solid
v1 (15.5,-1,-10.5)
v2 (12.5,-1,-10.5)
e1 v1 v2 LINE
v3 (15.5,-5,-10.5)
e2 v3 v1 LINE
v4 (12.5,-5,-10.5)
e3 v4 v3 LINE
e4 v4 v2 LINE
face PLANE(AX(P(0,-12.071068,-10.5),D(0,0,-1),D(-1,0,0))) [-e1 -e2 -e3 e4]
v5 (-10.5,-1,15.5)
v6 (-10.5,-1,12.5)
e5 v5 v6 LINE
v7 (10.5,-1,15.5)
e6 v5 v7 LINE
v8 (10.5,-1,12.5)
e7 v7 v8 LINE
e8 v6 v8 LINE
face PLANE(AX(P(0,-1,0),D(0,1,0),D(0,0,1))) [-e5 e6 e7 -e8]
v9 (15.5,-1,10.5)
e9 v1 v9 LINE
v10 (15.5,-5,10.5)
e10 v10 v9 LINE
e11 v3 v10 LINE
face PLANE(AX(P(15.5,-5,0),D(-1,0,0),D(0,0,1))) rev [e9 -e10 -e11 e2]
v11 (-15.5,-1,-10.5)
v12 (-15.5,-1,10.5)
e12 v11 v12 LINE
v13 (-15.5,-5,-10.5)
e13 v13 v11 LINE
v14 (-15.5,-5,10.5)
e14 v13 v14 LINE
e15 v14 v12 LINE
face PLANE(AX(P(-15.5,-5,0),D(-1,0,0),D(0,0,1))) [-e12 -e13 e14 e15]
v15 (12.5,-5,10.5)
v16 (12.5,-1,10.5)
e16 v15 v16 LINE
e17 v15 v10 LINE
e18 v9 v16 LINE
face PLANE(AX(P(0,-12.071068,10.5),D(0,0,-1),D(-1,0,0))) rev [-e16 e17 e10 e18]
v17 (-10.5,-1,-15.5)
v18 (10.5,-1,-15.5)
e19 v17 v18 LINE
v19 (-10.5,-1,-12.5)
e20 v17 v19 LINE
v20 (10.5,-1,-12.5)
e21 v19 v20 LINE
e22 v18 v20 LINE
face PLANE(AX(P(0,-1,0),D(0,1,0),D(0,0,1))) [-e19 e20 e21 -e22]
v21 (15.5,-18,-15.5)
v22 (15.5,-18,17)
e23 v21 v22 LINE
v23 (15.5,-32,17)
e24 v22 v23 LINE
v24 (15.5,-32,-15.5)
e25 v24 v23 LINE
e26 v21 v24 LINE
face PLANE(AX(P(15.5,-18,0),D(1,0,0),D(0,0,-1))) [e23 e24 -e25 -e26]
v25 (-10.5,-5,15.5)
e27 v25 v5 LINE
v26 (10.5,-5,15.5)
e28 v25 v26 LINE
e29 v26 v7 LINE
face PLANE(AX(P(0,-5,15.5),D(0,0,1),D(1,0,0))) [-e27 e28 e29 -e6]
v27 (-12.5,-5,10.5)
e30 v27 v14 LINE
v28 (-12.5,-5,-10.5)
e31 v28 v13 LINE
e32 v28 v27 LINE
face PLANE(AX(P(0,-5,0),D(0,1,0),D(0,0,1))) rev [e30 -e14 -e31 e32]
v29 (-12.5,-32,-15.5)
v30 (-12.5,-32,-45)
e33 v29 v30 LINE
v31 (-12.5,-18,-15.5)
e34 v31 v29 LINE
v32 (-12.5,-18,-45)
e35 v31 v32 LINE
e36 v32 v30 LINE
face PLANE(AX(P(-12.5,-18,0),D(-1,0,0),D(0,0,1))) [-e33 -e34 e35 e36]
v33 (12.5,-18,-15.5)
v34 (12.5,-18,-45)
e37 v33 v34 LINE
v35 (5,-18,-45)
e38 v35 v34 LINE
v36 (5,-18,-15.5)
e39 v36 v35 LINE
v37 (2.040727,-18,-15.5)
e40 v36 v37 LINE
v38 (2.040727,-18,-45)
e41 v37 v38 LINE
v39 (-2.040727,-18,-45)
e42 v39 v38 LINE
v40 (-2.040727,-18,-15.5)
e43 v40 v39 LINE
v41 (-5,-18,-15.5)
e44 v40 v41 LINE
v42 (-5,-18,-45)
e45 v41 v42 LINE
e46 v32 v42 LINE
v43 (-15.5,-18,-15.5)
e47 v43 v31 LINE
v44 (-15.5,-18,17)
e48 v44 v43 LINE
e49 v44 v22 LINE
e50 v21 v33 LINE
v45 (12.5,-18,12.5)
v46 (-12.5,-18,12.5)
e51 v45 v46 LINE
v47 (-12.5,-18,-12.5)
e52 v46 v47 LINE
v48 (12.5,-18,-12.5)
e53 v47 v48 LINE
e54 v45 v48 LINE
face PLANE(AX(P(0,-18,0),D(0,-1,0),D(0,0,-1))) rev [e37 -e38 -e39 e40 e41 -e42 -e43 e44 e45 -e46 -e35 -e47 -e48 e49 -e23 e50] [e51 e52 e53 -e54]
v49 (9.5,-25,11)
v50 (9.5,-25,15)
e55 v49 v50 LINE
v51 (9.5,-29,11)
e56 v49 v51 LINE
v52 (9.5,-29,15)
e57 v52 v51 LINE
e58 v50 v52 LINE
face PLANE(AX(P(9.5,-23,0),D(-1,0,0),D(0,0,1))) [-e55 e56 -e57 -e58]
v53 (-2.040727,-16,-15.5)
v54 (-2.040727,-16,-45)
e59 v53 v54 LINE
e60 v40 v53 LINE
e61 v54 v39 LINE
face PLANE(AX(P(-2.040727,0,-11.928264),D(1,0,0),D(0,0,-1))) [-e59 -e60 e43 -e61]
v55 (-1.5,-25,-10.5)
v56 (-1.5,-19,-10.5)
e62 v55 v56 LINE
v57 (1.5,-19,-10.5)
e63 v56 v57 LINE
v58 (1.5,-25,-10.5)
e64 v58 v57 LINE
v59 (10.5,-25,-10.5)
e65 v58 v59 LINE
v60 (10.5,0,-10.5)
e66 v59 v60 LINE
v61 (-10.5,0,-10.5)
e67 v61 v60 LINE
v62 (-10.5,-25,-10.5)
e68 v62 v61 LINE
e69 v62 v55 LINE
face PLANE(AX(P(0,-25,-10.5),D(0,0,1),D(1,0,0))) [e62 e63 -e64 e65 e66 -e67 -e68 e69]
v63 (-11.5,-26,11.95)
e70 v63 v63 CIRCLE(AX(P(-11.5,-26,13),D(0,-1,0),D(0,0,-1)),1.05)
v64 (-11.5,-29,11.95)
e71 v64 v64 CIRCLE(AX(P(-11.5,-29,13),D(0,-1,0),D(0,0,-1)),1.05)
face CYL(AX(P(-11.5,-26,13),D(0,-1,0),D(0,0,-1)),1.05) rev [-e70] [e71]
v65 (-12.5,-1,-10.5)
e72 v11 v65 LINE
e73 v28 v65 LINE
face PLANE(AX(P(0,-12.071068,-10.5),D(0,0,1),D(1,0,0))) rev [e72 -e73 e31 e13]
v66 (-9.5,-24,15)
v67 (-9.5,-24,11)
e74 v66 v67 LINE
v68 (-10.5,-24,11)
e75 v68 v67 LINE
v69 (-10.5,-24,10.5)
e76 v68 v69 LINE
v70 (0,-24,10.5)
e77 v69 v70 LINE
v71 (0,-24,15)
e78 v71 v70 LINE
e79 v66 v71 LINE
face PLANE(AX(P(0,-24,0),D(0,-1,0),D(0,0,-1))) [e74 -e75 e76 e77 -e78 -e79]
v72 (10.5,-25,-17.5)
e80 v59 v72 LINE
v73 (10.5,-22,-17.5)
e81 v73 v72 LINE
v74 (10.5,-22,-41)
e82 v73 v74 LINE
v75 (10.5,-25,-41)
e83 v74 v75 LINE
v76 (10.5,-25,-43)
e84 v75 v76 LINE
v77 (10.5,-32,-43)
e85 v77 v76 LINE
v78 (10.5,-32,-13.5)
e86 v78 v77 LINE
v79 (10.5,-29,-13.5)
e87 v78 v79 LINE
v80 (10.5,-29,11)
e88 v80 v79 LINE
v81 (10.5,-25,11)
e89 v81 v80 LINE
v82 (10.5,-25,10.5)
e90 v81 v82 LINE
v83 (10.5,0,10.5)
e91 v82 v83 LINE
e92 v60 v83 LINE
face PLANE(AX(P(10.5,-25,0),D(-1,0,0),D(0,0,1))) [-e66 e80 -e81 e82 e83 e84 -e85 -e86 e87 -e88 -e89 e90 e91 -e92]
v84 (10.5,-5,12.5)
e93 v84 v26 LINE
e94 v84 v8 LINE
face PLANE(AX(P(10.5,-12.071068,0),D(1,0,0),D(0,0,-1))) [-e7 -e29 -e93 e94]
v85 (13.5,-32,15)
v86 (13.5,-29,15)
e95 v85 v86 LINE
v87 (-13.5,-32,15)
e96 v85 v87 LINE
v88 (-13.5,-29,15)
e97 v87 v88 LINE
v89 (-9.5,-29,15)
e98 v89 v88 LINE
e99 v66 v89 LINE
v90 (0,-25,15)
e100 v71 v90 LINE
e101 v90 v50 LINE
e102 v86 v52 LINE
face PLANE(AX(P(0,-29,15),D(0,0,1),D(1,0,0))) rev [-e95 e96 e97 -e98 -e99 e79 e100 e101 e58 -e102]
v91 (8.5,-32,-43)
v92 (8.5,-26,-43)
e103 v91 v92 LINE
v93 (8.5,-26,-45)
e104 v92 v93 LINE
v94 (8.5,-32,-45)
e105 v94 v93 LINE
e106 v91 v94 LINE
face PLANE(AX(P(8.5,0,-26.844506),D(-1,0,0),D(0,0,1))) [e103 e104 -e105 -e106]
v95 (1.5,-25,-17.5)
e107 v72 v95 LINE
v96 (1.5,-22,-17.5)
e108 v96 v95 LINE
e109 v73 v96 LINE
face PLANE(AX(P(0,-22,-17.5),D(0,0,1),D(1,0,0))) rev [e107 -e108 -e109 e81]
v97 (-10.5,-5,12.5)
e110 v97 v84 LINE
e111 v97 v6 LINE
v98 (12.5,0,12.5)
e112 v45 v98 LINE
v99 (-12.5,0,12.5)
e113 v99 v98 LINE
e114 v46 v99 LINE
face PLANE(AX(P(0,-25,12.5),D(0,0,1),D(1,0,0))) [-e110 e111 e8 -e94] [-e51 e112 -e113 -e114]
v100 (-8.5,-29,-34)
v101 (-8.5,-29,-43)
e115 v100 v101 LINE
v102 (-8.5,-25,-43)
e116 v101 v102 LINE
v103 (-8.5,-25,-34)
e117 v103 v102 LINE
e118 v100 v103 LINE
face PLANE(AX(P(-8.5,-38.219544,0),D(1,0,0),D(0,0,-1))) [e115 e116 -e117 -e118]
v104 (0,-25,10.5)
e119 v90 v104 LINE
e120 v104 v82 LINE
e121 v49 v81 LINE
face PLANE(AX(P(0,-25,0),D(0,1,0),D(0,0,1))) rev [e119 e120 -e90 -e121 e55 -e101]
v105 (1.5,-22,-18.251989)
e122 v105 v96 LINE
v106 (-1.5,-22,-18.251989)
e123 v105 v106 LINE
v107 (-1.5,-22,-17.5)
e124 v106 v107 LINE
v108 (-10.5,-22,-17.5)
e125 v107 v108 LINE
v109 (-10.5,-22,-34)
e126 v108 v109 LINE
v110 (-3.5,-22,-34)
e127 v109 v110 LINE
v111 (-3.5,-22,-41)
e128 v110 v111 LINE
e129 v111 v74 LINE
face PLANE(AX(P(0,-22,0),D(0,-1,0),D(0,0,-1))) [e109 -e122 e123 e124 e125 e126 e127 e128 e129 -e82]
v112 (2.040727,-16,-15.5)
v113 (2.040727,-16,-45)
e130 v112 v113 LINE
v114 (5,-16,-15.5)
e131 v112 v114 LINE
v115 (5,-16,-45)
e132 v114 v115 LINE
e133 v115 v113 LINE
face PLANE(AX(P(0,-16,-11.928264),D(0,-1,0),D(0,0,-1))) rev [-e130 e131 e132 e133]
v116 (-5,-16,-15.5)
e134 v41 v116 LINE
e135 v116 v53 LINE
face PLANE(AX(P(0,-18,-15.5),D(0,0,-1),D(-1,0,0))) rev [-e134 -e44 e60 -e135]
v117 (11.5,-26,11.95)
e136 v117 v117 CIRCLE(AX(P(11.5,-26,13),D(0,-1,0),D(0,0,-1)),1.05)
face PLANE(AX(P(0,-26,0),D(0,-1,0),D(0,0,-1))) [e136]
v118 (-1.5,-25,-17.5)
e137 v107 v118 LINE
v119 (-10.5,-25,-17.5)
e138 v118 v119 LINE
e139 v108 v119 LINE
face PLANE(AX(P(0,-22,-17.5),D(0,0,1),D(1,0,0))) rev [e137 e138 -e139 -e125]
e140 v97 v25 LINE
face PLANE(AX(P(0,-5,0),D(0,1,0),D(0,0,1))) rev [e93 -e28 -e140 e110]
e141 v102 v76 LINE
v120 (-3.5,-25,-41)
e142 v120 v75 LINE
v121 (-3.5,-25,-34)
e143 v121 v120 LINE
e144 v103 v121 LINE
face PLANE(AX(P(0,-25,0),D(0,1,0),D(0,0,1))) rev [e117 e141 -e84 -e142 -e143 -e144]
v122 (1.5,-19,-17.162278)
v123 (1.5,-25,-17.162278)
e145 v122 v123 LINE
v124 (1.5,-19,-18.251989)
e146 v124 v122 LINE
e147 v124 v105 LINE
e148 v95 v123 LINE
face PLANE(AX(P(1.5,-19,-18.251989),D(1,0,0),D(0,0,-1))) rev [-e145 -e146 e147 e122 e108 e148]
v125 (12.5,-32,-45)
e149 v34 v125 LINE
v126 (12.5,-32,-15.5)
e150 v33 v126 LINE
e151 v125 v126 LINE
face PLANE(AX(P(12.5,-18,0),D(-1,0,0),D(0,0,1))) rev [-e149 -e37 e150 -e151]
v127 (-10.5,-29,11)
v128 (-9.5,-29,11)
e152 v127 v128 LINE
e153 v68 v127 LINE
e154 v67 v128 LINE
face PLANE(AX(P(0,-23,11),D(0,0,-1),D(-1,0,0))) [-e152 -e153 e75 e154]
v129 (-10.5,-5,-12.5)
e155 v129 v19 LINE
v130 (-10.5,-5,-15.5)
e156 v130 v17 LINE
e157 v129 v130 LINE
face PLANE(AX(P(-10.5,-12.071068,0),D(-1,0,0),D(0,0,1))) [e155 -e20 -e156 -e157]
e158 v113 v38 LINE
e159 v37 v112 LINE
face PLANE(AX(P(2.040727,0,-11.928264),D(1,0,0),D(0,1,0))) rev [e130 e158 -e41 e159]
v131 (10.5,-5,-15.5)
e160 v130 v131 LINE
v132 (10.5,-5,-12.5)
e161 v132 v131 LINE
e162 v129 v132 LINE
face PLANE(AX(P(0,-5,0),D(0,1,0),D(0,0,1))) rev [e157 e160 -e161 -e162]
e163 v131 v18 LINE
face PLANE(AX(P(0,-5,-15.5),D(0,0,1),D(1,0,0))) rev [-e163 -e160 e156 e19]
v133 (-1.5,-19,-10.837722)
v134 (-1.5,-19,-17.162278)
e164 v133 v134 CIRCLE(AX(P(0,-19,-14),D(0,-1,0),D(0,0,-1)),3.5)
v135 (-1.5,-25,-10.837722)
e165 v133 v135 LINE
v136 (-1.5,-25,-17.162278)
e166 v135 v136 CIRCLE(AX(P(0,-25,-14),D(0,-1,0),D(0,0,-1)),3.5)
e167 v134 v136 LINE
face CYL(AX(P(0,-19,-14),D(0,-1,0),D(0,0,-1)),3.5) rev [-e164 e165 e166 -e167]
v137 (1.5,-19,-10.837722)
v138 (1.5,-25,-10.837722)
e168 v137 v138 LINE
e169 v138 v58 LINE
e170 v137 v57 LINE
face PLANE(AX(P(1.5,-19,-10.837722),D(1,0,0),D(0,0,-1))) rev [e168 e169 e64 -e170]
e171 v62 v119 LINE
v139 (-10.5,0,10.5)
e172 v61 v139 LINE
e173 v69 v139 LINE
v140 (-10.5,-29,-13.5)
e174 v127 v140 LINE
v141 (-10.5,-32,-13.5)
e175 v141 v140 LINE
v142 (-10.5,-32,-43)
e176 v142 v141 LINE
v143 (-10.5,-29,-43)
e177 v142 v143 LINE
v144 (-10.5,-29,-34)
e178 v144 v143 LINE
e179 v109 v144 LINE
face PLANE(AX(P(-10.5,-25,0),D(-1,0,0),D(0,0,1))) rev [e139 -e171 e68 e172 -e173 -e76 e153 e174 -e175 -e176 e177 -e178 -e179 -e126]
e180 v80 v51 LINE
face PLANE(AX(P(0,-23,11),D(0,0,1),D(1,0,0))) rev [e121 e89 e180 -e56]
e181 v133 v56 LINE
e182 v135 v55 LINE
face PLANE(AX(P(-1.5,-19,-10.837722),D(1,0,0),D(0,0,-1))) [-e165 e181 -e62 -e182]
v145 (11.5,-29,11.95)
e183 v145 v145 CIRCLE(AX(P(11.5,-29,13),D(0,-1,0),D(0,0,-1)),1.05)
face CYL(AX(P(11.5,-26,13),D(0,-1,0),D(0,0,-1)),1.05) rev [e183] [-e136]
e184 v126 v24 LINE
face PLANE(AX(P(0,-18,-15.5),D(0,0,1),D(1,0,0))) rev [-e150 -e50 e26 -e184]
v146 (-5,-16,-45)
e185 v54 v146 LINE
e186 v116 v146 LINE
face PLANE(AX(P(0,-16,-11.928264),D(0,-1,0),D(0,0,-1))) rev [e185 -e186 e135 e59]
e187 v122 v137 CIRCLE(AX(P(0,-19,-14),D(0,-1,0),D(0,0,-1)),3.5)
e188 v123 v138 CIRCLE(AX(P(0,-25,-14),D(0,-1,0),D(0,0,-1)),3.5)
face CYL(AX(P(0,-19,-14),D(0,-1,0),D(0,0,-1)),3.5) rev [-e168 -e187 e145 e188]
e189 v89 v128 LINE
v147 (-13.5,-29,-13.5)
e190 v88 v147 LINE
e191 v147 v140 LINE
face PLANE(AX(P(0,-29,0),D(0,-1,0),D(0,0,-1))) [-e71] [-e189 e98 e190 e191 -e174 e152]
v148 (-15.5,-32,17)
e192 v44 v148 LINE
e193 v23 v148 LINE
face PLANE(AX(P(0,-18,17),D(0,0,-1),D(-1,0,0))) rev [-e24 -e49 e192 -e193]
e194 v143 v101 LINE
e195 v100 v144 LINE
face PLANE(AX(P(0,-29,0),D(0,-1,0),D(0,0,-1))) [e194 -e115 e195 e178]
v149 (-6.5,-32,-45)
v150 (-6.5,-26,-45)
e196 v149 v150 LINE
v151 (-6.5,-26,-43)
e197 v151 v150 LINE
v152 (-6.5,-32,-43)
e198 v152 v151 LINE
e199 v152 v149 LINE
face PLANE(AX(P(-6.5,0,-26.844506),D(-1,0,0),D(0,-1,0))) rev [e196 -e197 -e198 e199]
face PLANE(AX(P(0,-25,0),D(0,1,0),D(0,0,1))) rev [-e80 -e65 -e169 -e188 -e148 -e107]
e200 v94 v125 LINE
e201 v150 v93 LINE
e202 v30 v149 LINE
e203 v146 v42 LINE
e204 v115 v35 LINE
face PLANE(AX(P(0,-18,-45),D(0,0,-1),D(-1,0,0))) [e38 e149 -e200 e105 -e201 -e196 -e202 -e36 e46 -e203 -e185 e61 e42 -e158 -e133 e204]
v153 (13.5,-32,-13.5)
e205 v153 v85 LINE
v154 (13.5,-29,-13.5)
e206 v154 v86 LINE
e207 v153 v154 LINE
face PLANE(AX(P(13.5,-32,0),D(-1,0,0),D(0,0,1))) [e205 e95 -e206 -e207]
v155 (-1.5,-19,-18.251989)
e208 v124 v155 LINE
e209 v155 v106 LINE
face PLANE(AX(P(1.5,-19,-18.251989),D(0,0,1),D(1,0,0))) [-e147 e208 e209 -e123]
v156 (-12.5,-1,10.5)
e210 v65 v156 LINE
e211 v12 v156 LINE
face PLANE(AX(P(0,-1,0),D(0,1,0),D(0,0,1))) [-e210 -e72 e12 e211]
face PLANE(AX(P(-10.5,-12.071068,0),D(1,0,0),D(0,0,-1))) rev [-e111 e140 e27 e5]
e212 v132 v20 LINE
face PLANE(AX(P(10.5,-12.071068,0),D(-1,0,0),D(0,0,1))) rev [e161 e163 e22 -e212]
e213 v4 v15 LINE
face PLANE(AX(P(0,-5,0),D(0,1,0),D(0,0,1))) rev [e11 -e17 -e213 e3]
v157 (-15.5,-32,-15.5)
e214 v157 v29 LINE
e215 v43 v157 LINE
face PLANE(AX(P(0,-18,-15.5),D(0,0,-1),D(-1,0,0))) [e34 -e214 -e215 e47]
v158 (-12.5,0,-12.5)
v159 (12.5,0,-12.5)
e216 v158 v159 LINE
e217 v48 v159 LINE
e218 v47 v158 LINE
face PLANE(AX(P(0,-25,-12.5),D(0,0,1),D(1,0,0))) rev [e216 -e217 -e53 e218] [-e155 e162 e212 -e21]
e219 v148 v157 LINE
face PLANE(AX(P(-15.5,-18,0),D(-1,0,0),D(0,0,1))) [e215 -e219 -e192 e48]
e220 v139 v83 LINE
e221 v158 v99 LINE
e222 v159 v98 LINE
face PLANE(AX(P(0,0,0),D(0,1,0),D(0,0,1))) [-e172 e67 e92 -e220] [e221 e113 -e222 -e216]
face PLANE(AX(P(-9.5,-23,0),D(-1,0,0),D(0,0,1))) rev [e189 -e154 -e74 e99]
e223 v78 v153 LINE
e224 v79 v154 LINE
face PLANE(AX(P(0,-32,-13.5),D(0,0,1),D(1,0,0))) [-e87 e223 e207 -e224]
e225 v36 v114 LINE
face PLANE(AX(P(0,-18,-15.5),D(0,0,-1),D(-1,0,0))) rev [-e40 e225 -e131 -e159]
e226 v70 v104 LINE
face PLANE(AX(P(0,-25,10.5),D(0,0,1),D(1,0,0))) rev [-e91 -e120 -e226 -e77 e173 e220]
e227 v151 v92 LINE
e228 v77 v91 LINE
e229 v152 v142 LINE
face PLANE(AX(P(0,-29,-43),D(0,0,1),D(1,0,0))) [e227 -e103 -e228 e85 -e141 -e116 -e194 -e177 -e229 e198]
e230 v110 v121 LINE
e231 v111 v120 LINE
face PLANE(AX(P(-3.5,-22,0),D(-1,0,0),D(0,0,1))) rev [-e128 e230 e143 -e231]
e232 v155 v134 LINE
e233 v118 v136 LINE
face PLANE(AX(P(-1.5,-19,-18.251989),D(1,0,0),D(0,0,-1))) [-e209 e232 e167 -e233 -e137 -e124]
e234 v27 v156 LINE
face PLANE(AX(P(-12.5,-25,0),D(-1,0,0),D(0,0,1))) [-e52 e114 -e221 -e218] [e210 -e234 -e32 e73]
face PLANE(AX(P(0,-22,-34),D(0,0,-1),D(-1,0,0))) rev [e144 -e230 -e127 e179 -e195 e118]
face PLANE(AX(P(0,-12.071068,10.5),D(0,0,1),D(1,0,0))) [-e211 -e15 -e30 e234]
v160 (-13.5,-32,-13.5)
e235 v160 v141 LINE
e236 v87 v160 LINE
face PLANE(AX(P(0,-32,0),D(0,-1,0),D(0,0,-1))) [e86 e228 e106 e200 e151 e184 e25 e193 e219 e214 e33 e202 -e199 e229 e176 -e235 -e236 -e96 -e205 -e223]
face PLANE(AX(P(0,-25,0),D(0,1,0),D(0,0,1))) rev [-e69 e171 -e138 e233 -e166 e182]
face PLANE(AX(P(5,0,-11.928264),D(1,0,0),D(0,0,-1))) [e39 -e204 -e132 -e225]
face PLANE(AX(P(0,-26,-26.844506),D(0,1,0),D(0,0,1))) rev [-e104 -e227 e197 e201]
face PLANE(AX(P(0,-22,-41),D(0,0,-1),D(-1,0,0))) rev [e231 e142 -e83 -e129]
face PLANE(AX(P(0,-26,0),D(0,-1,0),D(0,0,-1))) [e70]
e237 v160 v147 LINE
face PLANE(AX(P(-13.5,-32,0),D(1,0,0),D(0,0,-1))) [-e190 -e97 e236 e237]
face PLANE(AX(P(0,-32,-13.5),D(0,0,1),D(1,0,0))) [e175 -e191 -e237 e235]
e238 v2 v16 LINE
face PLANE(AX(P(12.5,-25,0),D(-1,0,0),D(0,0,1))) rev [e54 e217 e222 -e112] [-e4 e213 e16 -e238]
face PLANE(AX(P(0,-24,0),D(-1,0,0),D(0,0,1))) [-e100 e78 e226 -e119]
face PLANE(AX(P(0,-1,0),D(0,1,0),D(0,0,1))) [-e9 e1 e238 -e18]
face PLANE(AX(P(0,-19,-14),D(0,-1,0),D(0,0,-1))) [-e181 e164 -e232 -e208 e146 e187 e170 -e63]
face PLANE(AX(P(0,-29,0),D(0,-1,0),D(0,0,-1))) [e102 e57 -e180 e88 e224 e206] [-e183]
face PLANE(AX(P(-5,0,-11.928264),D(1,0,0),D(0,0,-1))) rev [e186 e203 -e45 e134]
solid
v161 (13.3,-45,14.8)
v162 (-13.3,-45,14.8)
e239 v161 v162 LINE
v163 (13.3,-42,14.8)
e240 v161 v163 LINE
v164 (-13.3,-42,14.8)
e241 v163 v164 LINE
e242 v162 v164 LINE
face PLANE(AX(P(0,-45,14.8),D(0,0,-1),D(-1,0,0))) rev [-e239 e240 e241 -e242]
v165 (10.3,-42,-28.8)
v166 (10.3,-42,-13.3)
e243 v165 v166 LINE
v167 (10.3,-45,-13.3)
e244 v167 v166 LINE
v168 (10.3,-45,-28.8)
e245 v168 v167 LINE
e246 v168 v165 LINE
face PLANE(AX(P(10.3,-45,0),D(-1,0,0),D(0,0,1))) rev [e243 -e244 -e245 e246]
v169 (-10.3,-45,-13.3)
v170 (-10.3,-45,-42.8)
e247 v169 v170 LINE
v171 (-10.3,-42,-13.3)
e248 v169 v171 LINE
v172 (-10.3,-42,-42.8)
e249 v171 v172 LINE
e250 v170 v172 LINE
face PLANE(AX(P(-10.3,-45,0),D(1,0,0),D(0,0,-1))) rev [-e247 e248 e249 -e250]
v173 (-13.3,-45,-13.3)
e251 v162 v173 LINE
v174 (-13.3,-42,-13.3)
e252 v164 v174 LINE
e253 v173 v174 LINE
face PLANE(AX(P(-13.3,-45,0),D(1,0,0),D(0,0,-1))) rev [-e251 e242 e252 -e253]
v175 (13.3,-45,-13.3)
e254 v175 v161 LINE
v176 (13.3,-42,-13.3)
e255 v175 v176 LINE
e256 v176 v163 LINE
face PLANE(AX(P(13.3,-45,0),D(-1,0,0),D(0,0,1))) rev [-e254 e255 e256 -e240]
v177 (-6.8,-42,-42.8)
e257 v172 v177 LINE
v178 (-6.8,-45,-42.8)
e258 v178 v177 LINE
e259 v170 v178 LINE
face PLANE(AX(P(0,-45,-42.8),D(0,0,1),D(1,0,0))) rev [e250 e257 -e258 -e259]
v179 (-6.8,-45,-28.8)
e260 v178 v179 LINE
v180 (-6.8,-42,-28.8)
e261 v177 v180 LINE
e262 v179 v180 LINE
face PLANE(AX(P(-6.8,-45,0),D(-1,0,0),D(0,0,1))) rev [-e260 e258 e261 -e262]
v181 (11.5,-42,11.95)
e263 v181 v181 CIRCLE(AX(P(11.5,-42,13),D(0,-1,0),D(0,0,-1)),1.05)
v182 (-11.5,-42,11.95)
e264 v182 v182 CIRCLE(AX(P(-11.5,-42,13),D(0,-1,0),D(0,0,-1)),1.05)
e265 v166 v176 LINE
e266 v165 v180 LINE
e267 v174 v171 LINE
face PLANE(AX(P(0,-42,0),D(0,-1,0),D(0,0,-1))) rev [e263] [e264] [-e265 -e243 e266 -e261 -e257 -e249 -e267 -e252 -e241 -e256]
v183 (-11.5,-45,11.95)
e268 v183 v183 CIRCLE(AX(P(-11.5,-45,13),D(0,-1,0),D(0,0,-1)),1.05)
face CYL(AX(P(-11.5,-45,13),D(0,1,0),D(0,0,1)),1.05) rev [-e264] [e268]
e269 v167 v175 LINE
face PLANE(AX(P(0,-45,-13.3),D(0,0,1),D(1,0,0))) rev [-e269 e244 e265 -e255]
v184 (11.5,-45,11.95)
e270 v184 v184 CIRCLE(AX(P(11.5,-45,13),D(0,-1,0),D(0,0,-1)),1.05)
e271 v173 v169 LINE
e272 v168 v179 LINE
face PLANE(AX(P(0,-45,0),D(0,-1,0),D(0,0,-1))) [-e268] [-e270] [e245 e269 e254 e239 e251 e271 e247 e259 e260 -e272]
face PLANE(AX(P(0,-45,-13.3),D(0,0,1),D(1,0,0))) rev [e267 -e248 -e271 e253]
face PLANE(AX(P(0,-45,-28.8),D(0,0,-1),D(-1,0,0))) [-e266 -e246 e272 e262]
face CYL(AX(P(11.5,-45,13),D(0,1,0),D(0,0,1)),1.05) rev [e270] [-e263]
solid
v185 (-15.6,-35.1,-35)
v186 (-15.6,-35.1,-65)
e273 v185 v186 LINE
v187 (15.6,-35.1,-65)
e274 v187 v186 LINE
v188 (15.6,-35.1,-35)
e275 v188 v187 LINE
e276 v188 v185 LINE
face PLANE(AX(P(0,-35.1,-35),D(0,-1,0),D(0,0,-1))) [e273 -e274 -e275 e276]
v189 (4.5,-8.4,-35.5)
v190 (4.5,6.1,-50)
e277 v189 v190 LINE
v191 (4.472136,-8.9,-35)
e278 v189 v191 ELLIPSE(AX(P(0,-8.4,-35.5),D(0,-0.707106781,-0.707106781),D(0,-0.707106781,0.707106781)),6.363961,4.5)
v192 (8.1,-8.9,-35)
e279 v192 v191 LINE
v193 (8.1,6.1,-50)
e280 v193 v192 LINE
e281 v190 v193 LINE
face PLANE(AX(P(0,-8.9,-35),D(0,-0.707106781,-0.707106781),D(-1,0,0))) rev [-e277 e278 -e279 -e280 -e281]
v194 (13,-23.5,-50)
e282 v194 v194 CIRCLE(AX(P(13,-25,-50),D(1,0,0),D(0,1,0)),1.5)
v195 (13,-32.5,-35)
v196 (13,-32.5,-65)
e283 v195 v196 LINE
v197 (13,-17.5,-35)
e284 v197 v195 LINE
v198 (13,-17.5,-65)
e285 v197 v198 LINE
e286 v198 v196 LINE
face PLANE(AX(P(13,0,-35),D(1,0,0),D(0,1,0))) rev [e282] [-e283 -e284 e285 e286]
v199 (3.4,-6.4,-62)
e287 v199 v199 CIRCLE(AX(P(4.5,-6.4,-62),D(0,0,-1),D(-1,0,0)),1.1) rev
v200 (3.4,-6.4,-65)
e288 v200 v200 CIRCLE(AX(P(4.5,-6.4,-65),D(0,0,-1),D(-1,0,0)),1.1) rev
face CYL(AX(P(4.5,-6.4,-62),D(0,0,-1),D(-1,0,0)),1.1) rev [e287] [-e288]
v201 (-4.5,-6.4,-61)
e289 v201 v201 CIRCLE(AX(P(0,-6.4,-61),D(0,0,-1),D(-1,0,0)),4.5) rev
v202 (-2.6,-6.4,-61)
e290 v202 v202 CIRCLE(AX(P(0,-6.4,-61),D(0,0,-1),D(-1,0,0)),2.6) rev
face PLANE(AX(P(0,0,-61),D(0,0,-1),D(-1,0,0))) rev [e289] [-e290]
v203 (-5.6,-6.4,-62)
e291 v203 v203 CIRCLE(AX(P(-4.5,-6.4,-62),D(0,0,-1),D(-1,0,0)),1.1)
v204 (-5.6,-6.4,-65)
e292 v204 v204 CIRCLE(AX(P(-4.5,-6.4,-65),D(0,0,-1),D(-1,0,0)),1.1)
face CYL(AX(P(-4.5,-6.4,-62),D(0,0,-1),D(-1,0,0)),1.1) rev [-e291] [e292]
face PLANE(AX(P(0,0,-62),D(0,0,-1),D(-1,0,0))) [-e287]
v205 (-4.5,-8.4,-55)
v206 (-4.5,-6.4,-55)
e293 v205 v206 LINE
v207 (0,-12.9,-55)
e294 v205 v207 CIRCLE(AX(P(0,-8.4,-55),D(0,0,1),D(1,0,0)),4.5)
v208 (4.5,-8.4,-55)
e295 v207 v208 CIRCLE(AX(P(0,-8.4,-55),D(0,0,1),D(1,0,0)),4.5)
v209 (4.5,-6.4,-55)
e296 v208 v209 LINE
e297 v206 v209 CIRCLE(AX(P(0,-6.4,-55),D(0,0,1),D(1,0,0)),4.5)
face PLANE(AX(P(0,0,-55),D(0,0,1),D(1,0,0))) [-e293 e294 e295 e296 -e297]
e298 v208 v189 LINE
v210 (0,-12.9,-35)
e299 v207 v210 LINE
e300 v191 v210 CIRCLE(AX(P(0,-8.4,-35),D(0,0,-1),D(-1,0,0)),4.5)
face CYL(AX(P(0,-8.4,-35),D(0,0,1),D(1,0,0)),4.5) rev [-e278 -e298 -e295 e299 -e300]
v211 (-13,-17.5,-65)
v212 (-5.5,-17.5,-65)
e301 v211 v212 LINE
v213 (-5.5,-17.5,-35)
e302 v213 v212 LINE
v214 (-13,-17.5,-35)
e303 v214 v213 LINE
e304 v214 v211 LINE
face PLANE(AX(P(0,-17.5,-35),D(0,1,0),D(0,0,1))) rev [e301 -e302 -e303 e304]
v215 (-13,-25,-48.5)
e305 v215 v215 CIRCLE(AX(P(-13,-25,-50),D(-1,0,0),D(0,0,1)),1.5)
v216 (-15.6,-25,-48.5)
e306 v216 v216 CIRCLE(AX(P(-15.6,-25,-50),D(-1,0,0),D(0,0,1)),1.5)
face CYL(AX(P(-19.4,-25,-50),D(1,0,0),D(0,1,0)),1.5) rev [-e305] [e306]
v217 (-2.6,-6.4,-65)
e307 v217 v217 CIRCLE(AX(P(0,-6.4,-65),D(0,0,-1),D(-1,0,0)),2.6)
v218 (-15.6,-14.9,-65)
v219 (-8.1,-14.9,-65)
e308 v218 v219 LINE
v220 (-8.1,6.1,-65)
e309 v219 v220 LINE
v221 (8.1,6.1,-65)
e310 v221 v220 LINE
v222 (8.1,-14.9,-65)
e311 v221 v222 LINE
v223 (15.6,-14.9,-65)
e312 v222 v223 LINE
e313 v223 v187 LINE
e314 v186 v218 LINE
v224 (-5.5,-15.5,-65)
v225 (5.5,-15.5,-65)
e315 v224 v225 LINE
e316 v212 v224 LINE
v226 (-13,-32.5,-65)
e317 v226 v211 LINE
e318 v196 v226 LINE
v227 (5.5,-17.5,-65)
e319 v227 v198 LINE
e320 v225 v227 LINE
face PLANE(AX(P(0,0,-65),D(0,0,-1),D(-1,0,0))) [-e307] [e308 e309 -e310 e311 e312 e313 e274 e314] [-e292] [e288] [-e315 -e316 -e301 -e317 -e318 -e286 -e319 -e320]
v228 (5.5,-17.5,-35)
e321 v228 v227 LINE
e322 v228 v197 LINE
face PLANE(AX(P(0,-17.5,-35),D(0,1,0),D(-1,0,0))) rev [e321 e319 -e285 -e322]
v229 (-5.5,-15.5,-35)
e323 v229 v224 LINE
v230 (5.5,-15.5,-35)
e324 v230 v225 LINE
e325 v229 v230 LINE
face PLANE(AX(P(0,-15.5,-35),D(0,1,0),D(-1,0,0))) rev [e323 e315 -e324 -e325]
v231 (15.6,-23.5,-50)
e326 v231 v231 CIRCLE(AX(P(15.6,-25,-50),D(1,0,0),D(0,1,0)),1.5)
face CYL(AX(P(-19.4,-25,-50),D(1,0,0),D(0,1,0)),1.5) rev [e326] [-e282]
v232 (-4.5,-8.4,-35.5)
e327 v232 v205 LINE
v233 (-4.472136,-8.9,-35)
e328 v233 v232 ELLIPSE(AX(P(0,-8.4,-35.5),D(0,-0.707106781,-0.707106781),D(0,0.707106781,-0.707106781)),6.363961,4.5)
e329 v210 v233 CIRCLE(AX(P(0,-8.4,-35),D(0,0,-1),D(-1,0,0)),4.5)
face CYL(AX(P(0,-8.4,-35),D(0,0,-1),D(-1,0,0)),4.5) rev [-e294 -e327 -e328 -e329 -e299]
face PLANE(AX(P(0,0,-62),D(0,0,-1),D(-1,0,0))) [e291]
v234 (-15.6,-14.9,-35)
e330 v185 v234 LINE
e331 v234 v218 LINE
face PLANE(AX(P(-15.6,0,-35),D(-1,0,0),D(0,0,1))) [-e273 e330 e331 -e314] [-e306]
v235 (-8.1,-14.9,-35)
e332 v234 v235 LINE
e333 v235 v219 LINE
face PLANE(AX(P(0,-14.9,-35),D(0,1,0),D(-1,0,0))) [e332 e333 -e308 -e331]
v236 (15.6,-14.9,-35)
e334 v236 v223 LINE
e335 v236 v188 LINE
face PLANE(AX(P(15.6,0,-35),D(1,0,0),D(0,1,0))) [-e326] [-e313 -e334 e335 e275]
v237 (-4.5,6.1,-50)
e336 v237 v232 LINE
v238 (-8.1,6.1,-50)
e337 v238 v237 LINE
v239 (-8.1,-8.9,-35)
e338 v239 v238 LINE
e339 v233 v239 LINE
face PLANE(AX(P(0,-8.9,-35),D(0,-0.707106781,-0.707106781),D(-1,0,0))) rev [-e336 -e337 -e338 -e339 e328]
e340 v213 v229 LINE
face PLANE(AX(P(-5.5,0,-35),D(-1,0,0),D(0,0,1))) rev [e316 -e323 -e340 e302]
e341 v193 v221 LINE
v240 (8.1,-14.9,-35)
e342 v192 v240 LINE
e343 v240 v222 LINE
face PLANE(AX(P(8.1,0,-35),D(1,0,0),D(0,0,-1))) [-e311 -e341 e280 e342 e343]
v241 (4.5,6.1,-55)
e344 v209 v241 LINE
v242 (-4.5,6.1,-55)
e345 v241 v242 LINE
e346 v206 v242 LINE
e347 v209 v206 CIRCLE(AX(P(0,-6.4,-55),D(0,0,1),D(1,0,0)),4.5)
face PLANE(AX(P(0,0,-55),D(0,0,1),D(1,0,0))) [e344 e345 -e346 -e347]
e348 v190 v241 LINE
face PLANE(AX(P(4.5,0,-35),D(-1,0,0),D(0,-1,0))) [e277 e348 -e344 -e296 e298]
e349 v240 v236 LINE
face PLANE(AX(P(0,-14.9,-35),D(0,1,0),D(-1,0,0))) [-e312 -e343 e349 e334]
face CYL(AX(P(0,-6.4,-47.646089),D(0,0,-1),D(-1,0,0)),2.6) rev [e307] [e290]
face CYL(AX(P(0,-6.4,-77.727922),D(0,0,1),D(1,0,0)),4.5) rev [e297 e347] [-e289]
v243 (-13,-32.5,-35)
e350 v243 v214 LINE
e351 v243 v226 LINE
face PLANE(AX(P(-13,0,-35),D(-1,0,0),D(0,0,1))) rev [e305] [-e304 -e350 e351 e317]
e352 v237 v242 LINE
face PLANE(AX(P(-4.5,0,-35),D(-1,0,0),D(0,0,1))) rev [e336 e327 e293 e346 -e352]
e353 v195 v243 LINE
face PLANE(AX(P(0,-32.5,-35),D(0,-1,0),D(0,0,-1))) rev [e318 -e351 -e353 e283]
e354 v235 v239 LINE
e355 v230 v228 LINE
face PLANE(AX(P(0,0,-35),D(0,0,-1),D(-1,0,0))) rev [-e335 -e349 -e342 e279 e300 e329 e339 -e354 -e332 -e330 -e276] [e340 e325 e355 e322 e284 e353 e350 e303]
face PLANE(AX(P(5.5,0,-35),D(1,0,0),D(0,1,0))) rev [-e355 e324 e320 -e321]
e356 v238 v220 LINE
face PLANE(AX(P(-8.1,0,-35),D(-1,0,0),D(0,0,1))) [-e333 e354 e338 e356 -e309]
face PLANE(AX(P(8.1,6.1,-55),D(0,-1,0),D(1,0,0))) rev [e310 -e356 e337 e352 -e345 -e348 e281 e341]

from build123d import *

# Parameters (mm, degrees)
SKETCH2_W            = 25
SKETCH2_H            = 25
SKETCH2_W_2          = 21
SKETCH2_H_2          = 21
BOSS_EXTRUDE1_DEPTH  = 25
BOSS_EXTRUDE2_START  = -1
SKETCH2_3_W          = 31
SKETCH2_3_H          = 31
SKETCH2_3_W_2        = 25
SKETCH2_3_H_2        = 25
BOSS_EXTRUDE2_DEPTH  = 4
SKETCH3_W            = 21
SKETCH3_H            = 21
BOSS_EXTRUDE4_DEPTH  = 7
CUT_EXTRUDE2_DEPTH   = 6
SKETCH3_12_W         = 21
SKETCH3_12_H         = 58
BOSS_EXTRUDE5_DEPTH  = 4
SKETCH3_16_W         = 10.5
SKETCH3_16_H         = 2
SKETCH3_16_H_2       = 2.5
CUT_EXTRUDE12_DEPTH  = 1
SKETCH6_W            = 1
SKETCH6_H            = 4
BOSS_EXTRUDE7_DEPTH  = 6
BOSS_EXTRUDE8_DEPTH  = 3
SKETCH7_R            = 1.05
CUT_EXTRUDE9_DEPTH   = 3
CUT_EXTRUDE11_DEPTH  = 3
SKETCH10_W           = 2
SKETCH10_H           = 9
BOSS_EXTRUDE12_DEPTH = 4
SKETCH8_R            = 1.05
BOSS_EXTRUDE9_DEPTH  = 3
SKETCH9_W            = 15
SKETCH9_H            = 6
CUT_EXTRUDE10_DEPTH  = 2
SKETCH11_W           = 3
SKETCH11_H           = 3
SKETCH11_W_2         = 2
SKETCH11_H_2         = 2
CUT_EXTRUDE13_DEPTH  = 4
SKETCH12_W           = 2.959272996
SKETCH12_H           = 2
BOSS_EXTRUDE13_DEPTH = 29.5
BOSS_EXTRUDE14_DEPTH = 30
SKETCH14_W           = 16.2
SKETCH14_H           = 19
BOSS_EXTRUDE16_DEPTH = 10
SKETCH14_5_R         = 1.1
CUT_EXTRUDE14_DEPTH  = 3
SKETCH14_7_R         = 2.6
CUT_EXTRUDE15_DEPTH  = 10
CUT_EXTRUDE16_START  = -10
SKETCH14_8_R         = 4.5
CUT_EXTRUDE16_DEPTH  = 6
BOSS_EXTRUDE18_DEPTH = 20
CHAMFER1_SIZE        = 15
FILLET1_R            = 4.5
SKETCH19_R           = 1.5
CUT_EXTRUDE17_DEPTH  = 35


with BuildPart() as part:
    # Sketch2 → Boss-Extrude1 (new body)
    with BuildSketch(Plane(origin=(0, 0, 0), x_dir=(1, 0, 0), z_dir=(0, 1, 0))):
        Rectangle(SKETCH2_W, SKETCH2_H)
        Rectangle(SKETCH2_W_2, SKETCH2_H_2, mode=Mode.SUBTRACT)
    extrude(amount=-BOSS_EXTRUDE1_DEPTH)

    # Sketch2<3> → Boss-Extrude2 (add)
    with BuildSketch(Plane(origin=(0, 0, 0), x_dir=(1, 0, 0), z_dir=(0, 1, 0)).offset(BOSS_EXTRUDE2_START)):
        Rectangle(SKETCH2_3_W, SKETCH2_3_H)
        Rectangle(SKETCH2_3_W_2, SKETCH2_3_H_2, mode=Mode.SUBTRACT)
    extrude(amount=-BOSS_EXTRUDE2_DEPTH)

    # Sketch3 → Boss-Extrude4 (add)
    with BuildSketch(Plane.XZ.offset(25)):
        Polygon((-15.5, -15.5), (-12.5, -15.5), (-12.5, -45), (12.5, -45), (12.5, -15.5), (15.5, -15.5), (15.5, 17), (-15.5, 17), align=None)
        Rectangle(SKETCH3_W, SKETCH3_H, mode=Mode.SUBTRACT)
    extrude(amount=-BOSS_EXTRUDE4_DEPTH)

    # Sketch3<7> → Cut-Extrude2 (cut)
    with BuildSketch(Plane.XZ.offset(25)):
        with BuildLine():
            Line((-1.5, -10.83772234), (-1.5, -9.748010995))
            Line((-1.5, -9.748010995), (1.5, -9.748010995))
            Line((1.5, -9.748010995), (1.5, -10.83772234))
            ThreePointArc((1.5, -10.83772234), (3.5, -14), (1.5, -17.16227766))
            Line((1.5, -17.16227766), (1.5, -18.251989005))
            Line((1.5, -18.251989005), (-1.5, -18.251989005))
            Line((-1.5, -18.251989005), (-1.5, -17.16227766))
            ThreePointArc((-1.5, -17.16227766), (-3.5, -14), (-1.5, -10.83772234))
        make_face()
    extrude(amount=-CUT_EXTRUDE2_DEPTH, mode=Mode.SUBTRACT)

    # Sketch3<12> → Boss-Extrude5 (add)
    with BuildSketch(Plane.XZ.offset(25)):
        Polygon((-12.5, -15.5), (-12.5, -45), (12.5, -45), (12.5, -15.5), (15.5, -15.5), (15.5, 17), (-15.5, 17), (-15.5, -15.5), align=None)
        with Locations((0, -14)):
            Rectangle(SKETCH3_12_W, SKETCH3_12_H, mode=Mode.SUBTRACT)
    extrude(amount=BOSS_EXTRUDE5_DEPTH)

    # Sketch3<16> → Cut-Extrude12 (cut)
    with BuildSketch(Plane.XZ.offset(25)):
        with Locations((-5.25, 11.5)):
            Rectangle(SKETCH3_16_W, SKETCH3_16_H)
        with Locations((-5.25, 13.75)):
            Rectangle(SKETCH3_16_W, SKETCH3_16_H_2)
    extrude(amount=-CUT_EXTRUDE12_DEPTH, mode=Mode.SUBTRACT)

    # Sketch6 → Boss-Extrude7 (add)
    with BuildSketch(Plane.XZ.offset(29)):
        with Locations((10, 13)):
            Rectangle(SKETCH6_W, SKETCH6_H)
        with Locations((-10, 13)):
            Rectangle(SKETCH6_W, SKETCH6_H)
    extrude(amount=-BOSS_EXTRUDE7_DEPTH)

    # Sketch6<3> → Boss-Extrude8 (add)
    with BuildSketch(Plane.XZ.offset(29)):
        Polygon((15.5, -15.5), (15.5, 17), (-15.5, 17), (-15.5, -15.5), (-12.5, -15.5), (-12.5, -45), (12.5, -45), (12.5, -15.5), align=None)
        Polygon((10.5, 15), (13.5, 15), (13.5, 11), (13.5, -13.5), (10.5, -13.5), (10.5, -43), (-10.5, -43), (-10.5, -13.5), (-13.5, -13.5), (-13.5, 11), (-13.5, 15), (-10.5, 15), (-9.5, 15), (9.5, 15), align=None, mode=Mode.SUBTRACT)
    extrude(amount=BOSS_EXTRUDE8_DEPTH)

    # Sketch7 → Cut-Extrude9 (cut)
    with BuildSketch(Plane.XZ.offset(29)):
        with Locations(Location((-11.5, 13, 0), (0, 0, 270))):
            Circle(SKETCH7_R)
        with Locations(Location((11.5, 13, 0), (0, 0, 270))):
            Circle(SKETCH7_R)
    extrude(amount=-CUT_EXTRUDE9_DEPTH, mode=Mode.SUBTRACT)

    # Sketch3<14> → Cut-Extrude11 (cut)
    with BuildSketch(Plane.XZ.offset(25)):
        Polygon((-1.5, -17.5), (-10.5, -17.5), (-10.5, -34), (-3.5, -34), (-3.5, -41), (10.5, -41), (10.5, -17.5), (1.5, -17.5), (1.5, -18.251989005), (-1.5, -18.251989005), align=None)
    extrude(amount=-CUT_EXTRUDE11_DEPTH, mode=Mode.SUBTRACT)

    # Sketch10 → Boss-Extrude12 (add)
    with BuildSketch(Plane.XZ.offset(25)):
        with Locations((-9.5, -38.5)):
            Rectangle(SKETCH10_W, SKETCH10_H)
    extrude(amount=BOSS_EXTRUDE12_DEPTH)

    # Sketch9 → Cut-Extrude10 (cut)
    with BuildSketch(Plane(origin=(0, 0, -45), x_dir=(-1, 0, 0), z_dir=(0, 0, -1))):
        with Locations((-1, -29)):
            Rectangle(SKETCH9_W, SKETCH9_H)
    extrude(amount=-CUT_EXTRUDE10_DEPTH, mode=Mode.SUBTRACT)

    # Sketch11 → Cut-Extrude13 (cut)
    with BuildSketch(Plane(origin=(0, -1, 0), x_dir=(1, 0, 0), z_dir=(0, 1, 0))):
        with Locations((-14, -14)):
            Rectangle(SKETCH11_W, SKETCH11_H)
        with Locations((-11.5, -14)):
            Rectangle(SKETCH11_W_2, SKETCH11_H)
        with Locations((-14, -11.5)):
            Rectangle(SKETCH11_W, SKETCH11_H_2)
        with Locations((11.5, -14)):
            Rectangle(SKETCH11_W_2, SKETCH11_H)
        with Locations((14, -14)):
            Rectangle(SKETCH11_W, SKETCH11_H)
        with Locations((14, -11.5)):
            Rectangle(SKETCH11_W, SKETCH11_H_2)
        with Locations((-14, 11.5)):
            Rectangle(SKETCH11_W, SKETCH11_H_2)
        with Locations((-14, 14)):
            Rectangle(SKETCH11_W, SKETCH11_H)
        with Locations((-11.5, 14)):
            Rectangle(SKETCH11_W_2, SKETCH11_H)
        with Locations((11.5, 14)):
            Rectangle(SKETCH11_W_2, SKETCH11_H)
        with Locations((14, 14)):
            Rectangle(SKETCH11_W, SKETCH11_H)
        with Locations((14, 11.5)):
            Rectangle(SKETCH11_W, SKETCH11_H_2)
    extrude(amount=-CUT_EXTRUDE13_DEPTH, mode=Mode.SUBTRACT)

    # Sketch12 → Boss-Extrude13 (add)
    with BuildSketch(Plane(origin=(0, 0, -45), x_dir=(-1, 0, 0), z_dir=(0, 0, -1))):
        with Locations((-3.520363502, -17)):
            Rectangle(SKETCH12_W, SKETCH12_H)
        with Locations((3.520363502, -17)):
            Rectangle(SKETCH12_W, SKETCH12_H)
    extrude(amount=-BOSS_EXTRUDE13_DEPTH)


with BuildPart() as body_2:
    # Sketch8 → Boss-Extrude9 (new body)
    with BuildSketch(Plane(origin=(0, -42, 0), x_dir=(-1, 0, 0), z_dir=(0, -1, 0))):
        Polygon((-13.3, 13.3), (-13.3, -14.8), (13.3, -14.8), (13.3, 13.3), (10.3, 13.3), (10.3, 42.8), (6.8, 42.8), (6.8, 28.8), (-10.3, 28.8), (-10.3, 13.3), align=None)
        with Locations(Location((-11.5, -13, 0), (0, 0, 90))):
            Circle(SKETCH8_R, mode=Mode.SUBTRACT)
        with Locations(Location((11.5, -13, 0), (0, 0, 90))):
            Circle(SKETCH8_R, mode=Mode.SUBTRACT)
    extrude(amount=BOSS_EXTRUDE9_DEPTH)


with BuildPart() as body_3:
    # Sketch13 → Boss-Extrude14 (new body)
    with BuildSketch(Plane(origin=(0, 0, -65), x_dir=(-1, 0, 0), z_dir=(0, 0, -1))):
        Polygon((-8.5, -35.1), (6.5, -35.1), (15.6, -35.1), (15.6, -14.9), (8.1, -14.9), (8.1, -12.9), (0, -12.9), (-8.1, -12.9), (-8.1, -14.9), (-15.6, -14.9), (-15.6, -35.1), align=None)
        Polygon((13, -32.5), (6.5, -32.5), (-8.5, -32.5), (-13, -32.5), (-13, -17.5), (-5.5, -17.5), (-5.5, -15.5), (1.540727004, -15.5), (5.5, -15.5), (5.5, -17.5), (13, -17.5), align=None, mode=Mode.SUBTRACT)
    extrude(amount=-BOSS_EXTRUDE14_DEPTH)

    # Sketch14 → Boss-Extrude16 (add)
    with BuildSketch(Plane(origin=(0, 0, -65), x_dir=(-1, 0, 0), z_dir=(0, 0, -1))):
        with Locations((0, -3.4)):
            Rectangle(SKETCH14_W, SKETCH14_H)
    extrude(amount=-BOSS_EXTRUDE16_DEPTH)

    # Sketch14<5> → Cut-Extrude14 (cut)
    with BuildSketch(Plane(origin=(0, 0, -65), x_dir=(-1, 0, 0), z_dir=(0, 0, -1))):
        with Locations((4.5, -6.4)):
            Circle(SKETCH14_5_R)
        with Locations((-4.5, -6.4)):
            Circle(SKETCH14_5_R)
    extrude(amount=-CUT_EXTRUDE14_DEPTH, mode=Mode.SUBTRACT)

    # Sketch14<7> → Cut-Extrude15 (cut)
    with BuildSketch(Plane(origin=(0, 0, -65), x_dir=(-1, 0, 0), z_dir=(0, 0, -1))):
        with Locations((0, -6.4)):
            Circle(SKETCH14_7_R)
    extrude(amount=-CUT_EXTRUDE15_DEPTH, mode=Mode.SUBTRACT)

    # Sketch14<8> → Cut-Extrude16 (cut)
    with BuildSketch(Plane(origin=(0, 0, -65), x_dir=(-1, 0, 0), z_dir=(0, 0, -1)).offset(CUT_EXTRUDE16_START)):
        with Locations(Location((0, -6.4, 0), (0, 0, 180))):
            Circle(SKETCH14_8_R)
    extrude(amount=CUT_EXTRUDE16_DEPTH, mode=Mode.SUBTRACT)

    # Sketch18 → Boss-Extrude18 (add)
    with BuildSketch(Plane.XY.offset(-55)):
        Polygon((-8.1, 6.1), (-8.1, -12.9), (-4.5, -12.9), (-4.5, -6.4), (-4.5, 6.1), align=None)
        Polygon((4.5, -6.4), (4.5, -12.9), (8.1, -12.9), (8.1, 6.1), (4.5, 6.1), align=None)
    extrude(amount=BOSS_EXTRUDE18_DEPTH)

    # Chamfer1
    chamfer1_edges = [body_3.edges().sort_by_distance(p)[0] for p in [
        (6.3, 6.1, -35),
        (-6.3, 6.1, -35),
    ]]
    chamfer(chamfer1_edges, length=CHAMFER1_SIZE)

    # Fillet1
    fillet1_edges = [body_3.edges().sort_by_distance(p)[0] for p in [
        (4.5, -12.9, -45),
        (-4.5, -12.9, -45),
    ]]
    fillet(fillet1_edges, radius=FILLET1_R - 0.0001)  # a hair under: the kernel refuses the full size

    # Sketch19 → Cut-Extrude17 (cut)
    with BuildSketch(Plane(origin=(15.6, 0, 0), x_dir=(0, 0, -1), z_dir=(1, 0, 0))):
        with Locations(Location((50, -25, 0), (0, 0, 90))):
            Circle(SKETCH19_R)
    extrude(amount=-CUT_EXTRUDE17_DEPTH, mode=Mode.SUBTRACT)


solid = Compound([part.part, body_2.part, body_3.part])
